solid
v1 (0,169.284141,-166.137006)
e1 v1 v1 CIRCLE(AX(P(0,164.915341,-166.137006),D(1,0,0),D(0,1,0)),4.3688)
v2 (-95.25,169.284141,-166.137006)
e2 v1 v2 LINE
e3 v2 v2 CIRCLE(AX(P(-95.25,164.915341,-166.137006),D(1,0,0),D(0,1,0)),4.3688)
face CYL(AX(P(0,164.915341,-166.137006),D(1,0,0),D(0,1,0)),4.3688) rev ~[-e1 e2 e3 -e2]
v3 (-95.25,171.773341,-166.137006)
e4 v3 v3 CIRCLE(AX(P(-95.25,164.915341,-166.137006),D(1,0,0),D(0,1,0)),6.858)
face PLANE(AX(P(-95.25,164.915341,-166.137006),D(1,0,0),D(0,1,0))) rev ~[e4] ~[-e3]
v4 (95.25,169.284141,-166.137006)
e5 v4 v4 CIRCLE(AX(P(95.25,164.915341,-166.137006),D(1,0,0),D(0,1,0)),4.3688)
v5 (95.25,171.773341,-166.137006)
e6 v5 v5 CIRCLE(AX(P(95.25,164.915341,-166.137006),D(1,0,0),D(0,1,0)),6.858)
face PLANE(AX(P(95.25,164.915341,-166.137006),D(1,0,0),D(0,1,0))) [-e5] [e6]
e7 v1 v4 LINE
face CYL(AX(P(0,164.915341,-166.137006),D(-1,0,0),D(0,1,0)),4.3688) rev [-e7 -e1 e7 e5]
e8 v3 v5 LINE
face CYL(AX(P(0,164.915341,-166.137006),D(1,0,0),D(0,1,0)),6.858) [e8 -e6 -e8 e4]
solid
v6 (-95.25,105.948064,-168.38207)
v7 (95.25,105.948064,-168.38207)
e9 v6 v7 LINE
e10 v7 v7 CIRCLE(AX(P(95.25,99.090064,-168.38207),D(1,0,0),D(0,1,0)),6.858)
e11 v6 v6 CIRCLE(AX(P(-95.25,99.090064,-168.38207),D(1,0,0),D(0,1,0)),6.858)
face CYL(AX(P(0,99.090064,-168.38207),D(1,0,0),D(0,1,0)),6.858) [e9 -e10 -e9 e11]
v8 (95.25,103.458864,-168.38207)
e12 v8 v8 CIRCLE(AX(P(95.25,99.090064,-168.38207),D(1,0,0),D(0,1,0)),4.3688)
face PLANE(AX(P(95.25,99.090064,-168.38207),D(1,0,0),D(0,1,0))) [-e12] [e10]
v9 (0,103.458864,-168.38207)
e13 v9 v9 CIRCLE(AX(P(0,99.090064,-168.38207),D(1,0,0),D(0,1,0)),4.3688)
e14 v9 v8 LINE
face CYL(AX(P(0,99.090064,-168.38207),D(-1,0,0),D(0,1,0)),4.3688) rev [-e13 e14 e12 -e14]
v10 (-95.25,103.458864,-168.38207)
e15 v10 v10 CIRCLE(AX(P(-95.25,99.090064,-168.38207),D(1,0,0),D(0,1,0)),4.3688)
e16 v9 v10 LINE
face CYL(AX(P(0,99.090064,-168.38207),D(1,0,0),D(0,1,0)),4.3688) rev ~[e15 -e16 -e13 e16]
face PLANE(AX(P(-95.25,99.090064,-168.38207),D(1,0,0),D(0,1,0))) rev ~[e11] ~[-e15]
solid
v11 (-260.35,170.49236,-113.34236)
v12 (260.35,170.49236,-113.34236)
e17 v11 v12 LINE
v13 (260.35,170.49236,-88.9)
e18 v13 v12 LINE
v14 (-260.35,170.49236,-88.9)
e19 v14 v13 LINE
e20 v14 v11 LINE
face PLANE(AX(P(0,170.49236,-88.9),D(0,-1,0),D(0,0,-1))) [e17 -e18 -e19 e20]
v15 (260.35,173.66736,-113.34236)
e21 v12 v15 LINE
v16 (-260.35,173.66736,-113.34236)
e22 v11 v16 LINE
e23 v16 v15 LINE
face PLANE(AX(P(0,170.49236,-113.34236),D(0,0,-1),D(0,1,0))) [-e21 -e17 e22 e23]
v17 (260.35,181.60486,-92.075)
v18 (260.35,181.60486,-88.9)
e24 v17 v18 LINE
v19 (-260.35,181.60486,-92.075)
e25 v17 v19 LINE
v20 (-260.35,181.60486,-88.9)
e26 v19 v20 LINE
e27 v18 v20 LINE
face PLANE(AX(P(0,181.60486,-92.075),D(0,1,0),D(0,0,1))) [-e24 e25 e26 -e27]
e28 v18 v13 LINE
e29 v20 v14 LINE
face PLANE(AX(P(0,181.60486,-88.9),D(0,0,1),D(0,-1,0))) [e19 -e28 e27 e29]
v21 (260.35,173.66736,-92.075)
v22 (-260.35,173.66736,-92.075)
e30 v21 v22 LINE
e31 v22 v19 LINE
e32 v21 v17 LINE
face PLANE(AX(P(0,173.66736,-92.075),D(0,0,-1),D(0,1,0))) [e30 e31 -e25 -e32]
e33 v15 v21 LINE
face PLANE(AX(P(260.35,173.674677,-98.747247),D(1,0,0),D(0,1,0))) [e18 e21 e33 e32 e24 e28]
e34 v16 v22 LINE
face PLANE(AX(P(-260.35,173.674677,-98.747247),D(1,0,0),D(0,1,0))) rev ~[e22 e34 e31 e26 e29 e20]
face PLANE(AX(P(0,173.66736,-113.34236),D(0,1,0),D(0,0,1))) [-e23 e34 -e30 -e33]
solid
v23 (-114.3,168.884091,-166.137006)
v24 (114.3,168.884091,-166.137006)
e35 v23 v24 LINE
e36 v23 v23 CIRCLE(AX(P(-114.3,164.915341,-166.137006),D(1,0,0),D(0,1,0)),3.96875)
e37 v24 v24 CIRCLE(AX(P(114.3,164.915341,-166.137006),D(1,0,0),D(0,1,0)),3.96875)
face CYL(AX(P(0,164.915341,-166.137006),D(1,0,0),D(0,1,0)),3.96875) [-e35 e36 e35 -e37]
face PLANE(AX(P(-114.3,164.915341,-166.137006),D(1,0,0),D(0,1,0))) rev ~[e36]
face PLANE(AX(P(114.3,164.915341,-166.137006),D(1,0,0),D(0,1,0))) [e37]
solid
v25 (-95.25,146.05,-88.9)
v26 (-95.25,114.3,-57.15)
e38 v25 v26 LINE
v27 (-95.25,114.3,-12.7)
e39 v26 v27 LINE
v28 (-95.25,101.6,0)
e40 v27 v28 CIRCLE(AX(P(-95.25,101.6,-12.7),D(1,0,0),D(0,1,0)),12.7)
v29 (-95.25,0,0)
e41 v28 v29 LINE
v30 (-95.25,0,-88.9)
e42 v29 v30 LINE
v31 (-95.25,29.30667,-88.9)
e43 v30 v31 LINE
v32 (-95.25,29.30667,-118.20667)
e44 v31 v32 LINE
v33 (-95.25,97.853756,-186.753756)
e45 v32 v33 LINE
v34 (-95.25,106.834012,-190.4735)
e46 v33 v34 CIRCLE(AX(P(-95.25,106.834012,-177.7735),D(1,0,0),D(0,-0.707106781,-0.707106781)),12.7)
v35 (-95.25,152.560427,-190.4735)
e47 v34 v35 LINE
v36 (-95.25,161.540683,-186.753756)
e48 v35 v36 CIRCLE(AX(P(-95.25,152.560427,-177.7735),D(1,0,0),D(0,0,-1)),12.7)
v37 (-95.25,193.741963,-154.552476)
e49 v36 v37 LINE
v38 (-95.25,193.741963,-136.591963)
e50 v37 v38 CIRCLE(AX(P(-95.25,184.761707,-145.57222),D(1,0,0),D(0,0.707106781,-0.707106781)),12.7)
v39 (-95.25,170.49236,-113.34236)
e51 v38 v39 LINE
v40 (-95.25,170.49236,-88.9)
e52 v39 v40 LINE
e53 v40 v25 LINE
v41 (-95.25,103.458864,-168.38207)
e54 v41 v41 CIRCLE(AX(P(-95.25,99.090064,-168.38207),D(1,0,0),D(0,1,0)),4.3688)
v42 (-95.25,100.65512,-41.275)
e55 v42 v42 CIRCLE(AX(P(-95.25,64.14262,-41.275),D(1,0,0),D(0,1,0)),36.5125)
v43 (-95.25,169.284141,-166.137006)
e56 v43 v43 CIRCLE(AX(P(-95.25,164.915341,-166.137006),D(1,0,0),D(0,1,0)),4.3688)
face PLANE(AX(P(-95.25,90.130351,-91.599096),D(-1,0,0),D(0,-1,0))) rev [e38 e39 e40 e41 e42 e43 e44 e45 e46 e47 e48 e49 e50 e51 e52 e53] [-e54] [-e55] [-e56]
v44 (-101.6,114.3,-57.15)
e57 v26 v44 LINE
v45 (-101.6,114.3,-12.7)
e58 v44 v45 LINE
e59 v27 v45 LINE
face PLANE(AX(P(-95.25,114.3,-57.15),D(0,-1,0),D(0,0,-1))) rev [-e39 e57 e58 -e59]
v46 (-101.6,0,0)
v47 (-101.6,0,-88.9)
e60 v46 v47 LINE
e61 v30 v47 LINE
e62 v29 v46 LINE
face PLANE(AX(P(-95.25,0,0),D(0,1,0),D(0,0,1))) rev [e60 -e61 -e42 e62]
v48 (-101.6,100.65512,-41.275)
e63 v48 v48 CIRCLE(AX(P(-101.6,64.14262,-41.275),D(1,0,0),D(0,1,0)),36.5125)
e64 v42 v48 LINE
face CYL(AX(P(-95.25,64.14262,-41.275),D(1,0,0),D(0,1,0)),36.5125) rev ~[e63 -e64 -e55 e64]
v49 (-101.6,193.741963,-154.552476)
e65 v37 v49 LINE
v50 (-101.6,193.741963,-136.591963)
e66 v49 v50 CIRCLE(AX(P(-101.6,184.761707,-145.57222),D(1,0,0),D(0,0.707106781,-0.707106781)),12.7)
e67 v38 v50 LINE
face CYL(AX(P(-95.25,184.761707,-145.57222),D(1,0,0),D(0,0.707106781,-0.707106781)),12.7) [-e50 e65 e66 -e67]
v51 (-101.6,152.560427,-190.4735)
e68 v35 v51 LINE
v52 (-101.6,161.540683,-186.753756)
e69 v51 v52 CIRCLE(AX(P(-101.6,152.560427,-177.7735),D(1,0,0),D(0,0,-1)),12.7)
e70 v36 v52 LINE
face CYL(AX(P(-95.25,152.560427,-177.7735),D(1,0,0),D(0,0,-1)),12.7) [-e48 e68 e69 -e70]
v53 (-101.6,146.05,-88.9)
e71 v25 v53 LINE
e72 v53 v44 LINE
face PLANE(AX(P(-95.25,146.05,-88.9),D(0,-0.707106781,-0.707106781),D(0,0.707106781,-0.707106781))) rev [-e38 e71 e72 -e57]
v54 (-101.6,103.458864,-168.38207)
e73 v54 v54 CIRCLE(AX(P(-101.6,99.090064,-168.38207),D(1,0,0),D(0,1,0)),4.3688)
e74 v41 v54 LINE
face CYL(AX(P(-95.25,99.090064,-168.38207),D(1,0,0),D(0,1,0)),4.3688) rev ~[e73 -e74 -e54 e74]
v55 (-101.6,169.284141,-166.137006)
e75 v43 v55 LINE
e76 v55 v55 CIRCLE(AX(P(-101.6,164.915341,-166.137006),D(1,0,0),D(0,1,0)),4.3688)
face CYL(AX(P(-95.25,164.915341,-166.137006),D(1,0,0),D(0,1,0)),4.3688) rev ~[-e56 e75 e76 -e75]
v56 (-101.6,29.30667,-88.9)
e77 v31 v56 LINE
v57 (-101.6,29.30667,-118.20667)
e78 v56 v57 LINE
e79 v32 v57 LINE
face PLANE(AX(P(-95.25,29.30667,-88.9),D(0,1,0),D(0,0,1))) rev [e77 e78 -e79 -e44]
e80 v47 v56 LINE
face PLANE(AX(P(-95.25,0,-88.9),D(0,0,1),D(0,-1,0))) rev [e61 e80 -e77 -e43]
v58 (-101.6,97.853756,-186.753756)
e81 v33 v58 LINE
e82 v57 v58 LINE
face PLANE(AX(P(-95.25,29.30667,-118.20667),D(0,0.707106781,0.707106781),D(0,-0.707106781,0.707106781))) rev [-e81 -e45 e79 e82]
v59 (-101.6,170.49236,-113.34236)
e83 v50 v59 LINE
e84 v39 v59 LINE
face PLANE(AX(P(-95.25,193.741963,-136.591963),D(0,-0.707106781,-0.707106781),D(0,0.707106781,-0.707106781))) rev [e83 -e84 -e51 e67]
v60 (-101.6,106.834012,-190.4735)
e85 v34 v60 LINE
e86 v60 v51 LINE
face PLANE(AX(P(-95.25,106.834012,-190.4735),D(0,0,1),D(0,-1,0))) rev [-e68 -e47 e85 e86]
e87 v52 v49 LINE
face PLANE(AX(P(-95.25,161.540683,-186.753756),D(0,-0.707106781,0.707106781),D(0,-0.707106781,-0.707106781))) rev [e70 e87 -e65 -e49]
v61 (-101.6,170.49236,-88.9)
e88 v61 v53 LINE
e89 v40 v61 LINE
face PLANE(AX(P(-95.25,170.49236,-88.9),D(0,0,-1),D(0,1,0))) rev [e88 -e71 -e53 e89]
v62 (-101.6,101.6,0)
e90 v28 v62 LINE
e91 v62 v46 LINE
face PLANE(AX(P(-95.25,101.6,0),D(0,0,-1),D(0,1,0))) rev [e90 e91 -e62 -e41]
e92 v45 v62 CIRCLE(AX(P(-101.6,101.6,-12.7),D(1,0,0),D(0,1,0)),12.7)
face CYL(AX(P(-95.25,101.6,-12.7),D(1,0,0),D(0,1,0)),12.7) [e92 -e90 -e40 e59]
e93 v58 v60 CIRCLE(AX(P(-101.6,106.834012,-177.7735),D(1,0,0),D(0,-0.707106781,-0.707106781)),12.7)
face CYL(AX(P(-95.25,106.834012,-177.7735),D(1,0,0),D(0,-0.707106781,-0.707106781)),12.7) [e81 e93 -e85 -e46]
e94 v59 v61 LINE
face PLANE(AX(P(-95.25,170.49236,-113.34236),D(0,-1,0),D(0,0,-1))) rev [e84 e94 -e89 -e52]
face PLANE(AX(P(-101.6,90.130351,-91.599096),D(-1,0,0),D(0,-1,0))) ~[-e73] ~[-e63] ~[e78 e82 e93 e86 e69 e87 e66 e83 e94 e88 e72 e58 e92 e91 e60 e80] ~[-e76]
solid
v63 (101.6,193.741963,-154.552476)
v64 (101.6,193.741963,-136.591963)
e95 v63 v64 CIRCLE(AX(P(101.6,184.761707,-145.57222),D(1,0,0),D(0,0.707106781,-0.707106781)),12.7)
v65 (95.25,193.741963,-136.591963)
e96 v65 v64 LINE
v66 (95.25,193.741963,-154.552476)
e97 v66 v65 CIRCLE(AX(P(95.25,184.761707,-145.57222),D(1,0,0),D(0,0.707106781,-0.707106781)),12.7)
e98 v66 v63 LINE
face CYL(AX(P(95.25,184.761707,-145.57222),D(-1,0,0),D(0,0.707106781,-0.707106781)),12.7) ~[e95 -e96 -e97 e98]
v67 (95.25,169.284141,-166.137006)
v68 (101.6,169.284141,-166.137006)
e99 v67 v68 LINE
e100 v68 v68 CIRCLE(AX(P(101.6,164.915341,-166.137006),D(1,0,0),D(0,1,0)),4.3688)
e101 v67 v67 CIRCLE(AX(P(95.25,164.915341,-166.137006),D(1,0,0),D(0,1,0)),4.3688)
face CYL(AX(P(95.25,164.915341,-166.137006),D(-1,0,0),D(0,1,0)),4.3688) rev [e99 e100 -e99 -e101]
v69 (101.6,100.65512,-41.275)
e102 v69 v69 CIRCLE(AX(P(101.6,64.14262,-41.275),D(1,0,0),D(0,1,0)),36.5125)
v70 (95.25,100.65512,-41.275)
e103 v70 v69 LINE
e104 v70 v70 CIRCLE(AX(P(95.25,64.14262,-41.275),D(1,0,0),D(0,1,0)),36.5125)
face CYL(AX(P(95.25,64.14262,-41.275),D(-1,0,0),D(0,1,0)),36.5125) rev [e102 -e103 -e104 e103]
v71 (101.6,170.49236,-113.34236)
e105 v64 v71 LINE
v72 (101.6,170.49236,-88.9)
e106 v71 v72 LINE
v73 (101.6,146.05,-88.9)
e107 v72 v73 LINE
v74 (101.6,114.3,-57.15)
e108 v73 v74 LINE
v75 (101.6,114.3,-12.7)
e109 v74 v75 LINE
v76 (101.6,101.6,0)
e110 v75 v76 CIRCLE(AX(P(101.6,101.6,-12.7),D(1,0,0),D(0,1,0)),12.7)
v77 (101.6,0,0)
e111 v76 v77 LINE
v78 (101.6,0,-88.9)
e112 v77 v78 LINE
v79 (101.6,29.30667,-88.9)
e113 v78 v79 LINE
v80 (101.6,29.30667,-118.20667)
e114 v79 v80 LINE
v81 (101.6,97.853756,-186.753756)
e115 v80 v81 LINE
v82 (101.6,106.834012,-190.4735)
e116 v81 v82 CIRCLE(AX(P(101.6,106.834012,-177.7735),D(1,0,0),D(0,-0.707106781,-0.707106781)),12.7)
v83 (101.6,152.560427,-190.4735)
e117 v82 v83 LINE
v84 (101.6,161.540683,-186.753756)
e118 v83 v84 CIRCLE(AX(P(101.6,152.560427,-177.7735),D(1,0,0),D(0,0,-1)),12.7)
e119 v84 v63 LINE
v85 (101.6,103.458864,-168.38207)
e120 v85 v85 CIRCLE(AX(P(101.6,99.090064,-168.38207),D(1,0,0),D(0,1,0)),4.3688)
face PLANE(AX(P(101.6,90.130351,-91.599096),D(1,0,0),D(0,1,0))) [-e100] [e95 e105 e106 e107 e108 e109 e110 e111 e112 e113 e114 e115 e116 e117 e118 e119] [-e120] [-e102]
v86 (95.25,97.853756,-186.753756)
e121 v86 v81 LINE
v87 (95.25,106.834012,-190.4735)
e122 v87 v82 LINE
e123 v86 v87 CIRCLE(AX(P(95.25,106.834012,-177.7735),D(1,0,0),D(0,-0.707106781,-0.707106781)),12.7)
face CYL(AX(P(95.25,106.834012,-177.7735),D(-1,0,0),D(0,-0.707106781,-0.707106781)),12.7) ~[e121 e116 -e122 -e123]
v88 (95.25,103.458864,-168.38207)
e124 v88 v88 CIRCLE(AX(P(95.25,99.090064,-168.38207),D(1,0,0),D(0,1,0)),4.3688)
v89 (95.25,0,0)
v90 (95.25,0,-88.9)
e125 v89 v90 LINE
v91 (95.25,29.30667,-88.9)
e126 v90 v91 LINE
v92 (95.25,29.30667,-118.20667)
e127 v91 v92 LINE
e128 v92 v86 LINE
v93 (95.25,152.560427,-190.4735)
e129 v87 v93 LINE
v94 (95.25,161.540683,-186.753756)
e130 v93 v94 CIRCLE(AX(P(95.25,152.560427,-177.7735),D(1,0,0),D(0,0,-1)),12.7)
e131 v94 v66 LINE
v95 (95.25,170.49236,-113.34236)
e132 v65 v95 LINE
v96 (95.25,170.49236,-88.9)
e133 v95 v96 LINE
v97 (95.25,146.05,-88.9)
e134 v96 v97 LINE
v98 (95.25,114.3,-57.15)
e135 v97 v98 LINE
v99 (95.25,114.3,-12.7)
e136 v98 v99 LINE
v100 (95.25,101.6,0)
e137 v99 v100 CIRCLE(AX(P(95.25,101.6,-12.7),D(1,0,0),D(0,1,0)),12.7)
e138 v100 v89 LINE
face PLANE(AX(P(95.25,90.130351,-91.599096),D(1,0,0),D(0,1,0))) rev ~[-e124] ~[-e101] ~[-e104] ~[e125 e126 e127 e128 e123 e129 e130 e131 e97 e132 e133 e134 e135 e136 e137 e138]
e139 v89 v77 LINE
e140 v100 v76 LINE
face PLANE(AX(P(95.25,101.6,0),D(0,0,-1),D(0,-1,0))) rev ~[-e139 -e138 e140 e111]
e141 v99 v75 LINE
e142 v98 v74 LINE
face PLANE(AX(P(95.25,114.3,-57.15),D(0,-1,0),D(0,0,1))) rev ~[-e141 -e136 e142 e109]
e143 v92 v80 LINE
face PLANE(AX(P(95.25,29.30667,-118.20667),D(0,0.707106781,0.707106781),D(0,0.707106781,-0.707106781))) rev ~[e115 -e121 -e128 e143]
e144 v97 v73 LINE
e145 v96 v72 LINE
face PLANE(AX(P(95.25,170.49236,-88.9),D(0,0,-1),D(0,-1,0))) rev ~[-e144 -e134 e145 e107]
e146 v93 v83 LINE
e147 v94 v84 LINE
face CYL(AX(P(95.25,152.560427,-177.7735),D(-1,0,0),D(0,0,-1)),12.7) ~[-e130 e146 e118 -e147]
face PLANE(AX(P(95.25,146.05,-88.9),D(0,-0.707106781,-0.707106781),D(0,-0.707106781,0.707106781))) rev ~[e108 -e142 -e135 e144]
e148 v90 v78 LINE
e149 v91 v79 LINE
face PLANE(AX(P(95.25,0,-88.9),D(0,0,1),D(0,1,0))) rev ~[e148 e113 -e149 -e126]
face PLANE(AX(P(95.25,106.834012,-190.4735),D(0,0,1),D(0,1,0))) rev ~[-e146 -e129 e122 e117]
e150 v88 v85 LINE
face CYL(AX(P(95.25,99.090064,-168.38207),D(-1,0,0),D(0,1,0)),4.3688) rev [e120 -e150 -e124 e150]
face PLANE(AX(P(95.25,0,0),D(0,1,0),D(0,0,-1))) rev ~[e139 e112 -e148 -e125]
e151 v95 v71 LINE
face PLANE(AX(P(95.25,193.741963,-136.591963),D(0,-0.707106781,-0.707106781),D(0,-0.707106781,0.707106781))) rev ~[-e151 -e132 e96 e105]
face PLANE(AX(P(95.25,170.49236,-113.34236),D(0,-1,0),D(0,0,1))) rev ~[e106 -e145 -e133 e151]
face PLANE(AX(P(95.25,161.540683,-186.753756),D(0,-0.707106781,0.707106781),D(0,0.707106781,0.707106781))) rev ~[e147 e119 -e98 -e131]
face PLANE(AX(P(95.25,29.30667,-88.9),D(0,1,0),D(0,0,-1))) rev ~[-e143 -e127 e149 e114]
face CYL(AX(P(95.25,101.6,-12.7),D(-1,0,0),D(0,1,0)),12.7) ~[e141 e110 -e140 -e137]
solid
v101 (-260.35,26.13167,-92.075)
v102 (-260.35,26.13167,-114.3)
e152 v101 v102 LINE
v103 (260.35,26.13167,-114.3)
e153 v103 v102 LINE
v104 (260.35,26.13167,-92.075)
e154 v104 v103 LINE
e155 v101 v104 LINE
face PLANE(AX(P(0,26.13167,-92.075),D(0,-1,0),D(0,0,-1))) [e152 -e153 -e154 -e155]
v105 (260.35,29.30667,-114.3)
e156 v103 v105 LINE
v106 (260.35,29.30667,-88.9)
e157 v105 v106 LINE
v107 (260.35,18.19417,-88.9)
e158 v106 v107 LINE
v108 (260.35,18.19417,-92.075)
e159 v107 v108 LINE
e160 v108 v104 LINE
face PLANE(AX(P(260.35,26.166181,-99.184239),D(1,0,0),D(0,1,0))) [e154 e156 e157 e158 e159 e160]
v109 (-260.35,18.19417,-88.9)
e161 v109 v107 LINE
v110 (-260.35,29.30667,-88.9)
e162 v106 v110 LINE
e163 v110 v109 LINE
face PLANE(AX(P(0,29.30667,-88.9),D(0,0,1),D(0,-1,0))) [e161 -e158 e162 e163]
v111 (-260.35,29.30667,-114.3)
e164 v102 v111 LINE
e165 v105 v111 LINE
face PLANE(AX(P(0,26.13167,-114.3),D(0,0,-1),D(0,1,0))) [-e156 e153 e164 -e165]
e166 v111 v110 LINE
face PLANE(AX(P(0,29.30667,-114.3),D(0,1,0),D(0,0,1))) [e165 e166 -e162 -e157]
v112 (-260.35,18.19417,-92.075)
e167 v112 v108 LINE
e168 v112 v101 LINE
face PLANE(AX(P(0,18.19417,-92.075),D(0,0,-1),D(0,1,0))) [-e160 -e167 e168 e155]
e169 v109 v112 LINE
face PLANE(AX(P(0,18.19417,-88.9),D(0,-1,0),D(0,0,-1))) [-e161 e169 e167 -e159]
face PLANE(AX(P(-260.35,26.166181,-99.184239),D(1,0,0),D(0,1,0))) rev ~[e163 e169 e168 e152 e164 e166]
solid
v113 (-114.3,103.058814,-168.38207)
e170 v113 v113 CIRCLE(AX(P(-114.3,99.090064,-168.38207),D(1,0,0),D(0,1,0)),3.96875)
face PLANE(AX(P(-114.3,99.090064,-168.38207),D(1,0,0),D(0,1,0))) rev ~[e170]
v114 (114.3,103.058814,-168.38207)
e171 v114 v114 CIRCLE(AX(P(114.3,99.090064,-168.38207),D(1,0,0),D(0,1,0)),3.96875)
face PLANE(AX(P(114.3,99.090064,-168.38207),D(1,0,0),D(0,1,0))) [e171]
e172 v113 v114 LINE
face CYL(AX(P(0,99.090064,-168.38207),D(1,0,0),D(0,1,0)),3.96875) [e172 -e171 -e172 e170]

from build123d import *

# Parameters (mm, degrees)
F4_DEPTH      = 260.35
F4_DEPTH_BACK = 260.35
F2_R          = 6.858
F2_R_2        = 4.3688
F5_DEPTH      = 95.25
F5_DEPTH_BACK = 95.25
F2_R_3        = 3.96875
F6_DEPTH      = 114.3
F6_DEPTH_BACK = 114.3
F7_R          = 4.3688
F7_R_2        = 6.858
F7_R_3        = 36.5125
F8_DEPTH      = 6.35


# Not quite as in the source:
# - a variable given as a bare number and used for a length is read in inches; the dataset says mm whatever the document's units were


with BuildPart() as f4:
    # F2 (on Right) → F4 (new body, two sides)
    with BuildSketch(Plane.YZ) as f4_sk:
        Polygon((29.3066704261, -88.9), (18.1941704261, -88.9), (18.1941704261, -92.075), (26.1316704261, -92.075), (26.1316704261, -114.3), (29.3066704261, -114.3), align=None)
    extrude(amount=F4_DEPTH)
    extrude(f4_sk.sketch, amount=-F4_DEPTH_BACK)


with BuildPart() as f4b:
    # F2 (on Right) → F4, piece 2 (new body, two sides)
    with BuildSketch(Plane.YZ) as f4_2_sk:
        Polygon((181.6048598051, -88.9), (170.4923598051, -88.9), (170.4923598051, -113.3423598051), (173.6673598051, -113.3423598051), (173.6673598051, -92.075), (181.6048598051, -92.075), align=None)
    extrude(amount=F4_DEPTH)
    extrude(f4_2_sk.sketch, amount=-F4_DEPTH_BACK)


with BuildPart() as f5:
    # F2 (on Right) → F5 (new body, two sides)
    with BuildSketch(Plane.YZ) as f5_sk:
        with Locations((164.9153412521, -166.1370060391)):
            Circle(F2_R)
        with Locations((164.9153412521, -166.1370060391)):
            Circle(F2_R_2, mode=Mode.SUBTRACT)
    extrude(amount=F5_DEPTH)
    extrude(f5_sk.sketch, amount=-F5_DEPTH_BACK)


with BuildPart() as f5b:
    # F2 (on Right) → F5, piece 2 (new body, two sides)
    with BuildSketch(Plane.YZ) as f5_2_sk:
        with Locations((99.0900638847, -168.3820700693)):
            Circle(F2_R)
        with Locations((99.0900638847, -168.3820700693)):
            Circle(F2_R_2, mode=Mode.SUBTRACT)
    extrude(amount=F5_DEPTH)
    extrude(f5_2_sk.sketch, amount=-F5_DEPTH_BACK)


with BuildPart() as f6:
    # F2 (on Right) → F6 (new body, two sides)
    with BuildSketch(Plane.YZ) as f6_sk:
        with Locations((99.0900638847, -168.3820700693)):
            Circle(F2_R_3)
    extrude(amount=F6_DEPTH)
    extrude(f6_sk.sketch, amount=-F6_DEPTH_BACK)


with BuildPart() as f6b:
    # F2 (on Right) → F6, piece 2 (new body, two sides)
    with BuildSketch(Plane.YZ) as f6_2_sk:
        with Locations((164.9153412521, -166.1370060391)):
            Circle(F2_R_3)
    extrude(amount=F6_DEPTH)
    extrude(f6_2_sk.sketch, amount=-F6_DEPTH_BACK)


with BuildPart() as f8:
    # F7 (on face) → F8 (new body)
    with BuildSketch(Plane.YZ.offset(95.25)):
        with BuildLine():
            ThreePointArc((97.8537562482, -186.7537562482), (101.9739327783, -189.5067701901), (106.8340123693, -190.4735001272))
            Line((106.8340123693, -190.4735001272), (152.5604266743, -190.4735001272))
            ThreePointArc((152.5604266743, -190.4735001272), (157.4205062654, -189.5067701901), (161.5406827954, -186.7537562482))
            Line((161.5406827954, -186.7537562482), (193.7419634008, -154.5524756429))
            ThreePointArc((193.7419634008, -154.5524756429), (197.4617072797, -145.5722195218), (193.7419634008, -136.5919634008))
            Line((193.7419634008, -136.5919634008), (170.4923598051, -113.3423598051))
            Line((170.4923598051, -113.3423598051), (170.4923598051, -88.9))
            Line((170.4923598051, -88.9), (146.05, -88.9))
            Line((146.05, -88.9), (114.3, -57.15))
            Line((114.3, -57.15), (114.3, -12.7))
            ThreePointArc((114.3, -12.7), (110.5802561211, -3.7197438789), (101.6, 0))
            Line((101.6, 0), (0, 0))
            Line((0, 0), (0, -88.9))
            Line((0, -88.9), (29.3066704261, -88.9))
            Line((29.3066704261, -88.9), (29.3066704261, -118.2066704261))
            Line((29.3066704261, -118.2066704261), (97.8537562482, -186.7537562482))
        make_face()
        with Locations((99.0900638847, -168.3820700693)):
            Circle(F7_R, mode=Mode.SUBTRACT)
        with Locations((164.9153412521, -166.1370060391)):
            Circle(F7_R_2, mode=Mode.SUBTRACT)
        with Locations((64.14262, -41.275)):
            Circle(F7_R_3, mode=Mode.SUBTRACT)
        with Locations((164.9153412521, -166.1370060391)):
            Circle(F7_R_2)
        with Locations((164.9153412521, -166.1370060391)):
            Circle(F7_R, mode=Mode.SUBTRACT)
    extrude(amount=F8_DEPTH)


with BuildPart() as f9_1:
    # F9: instance of F8
    add(f8.part.mirror(Plane.YZ))


solid = Compound([f4.part, f4b.part, f5.part, f5b.part, f6.part, f6b.part, f8.part, f9_1.part])
